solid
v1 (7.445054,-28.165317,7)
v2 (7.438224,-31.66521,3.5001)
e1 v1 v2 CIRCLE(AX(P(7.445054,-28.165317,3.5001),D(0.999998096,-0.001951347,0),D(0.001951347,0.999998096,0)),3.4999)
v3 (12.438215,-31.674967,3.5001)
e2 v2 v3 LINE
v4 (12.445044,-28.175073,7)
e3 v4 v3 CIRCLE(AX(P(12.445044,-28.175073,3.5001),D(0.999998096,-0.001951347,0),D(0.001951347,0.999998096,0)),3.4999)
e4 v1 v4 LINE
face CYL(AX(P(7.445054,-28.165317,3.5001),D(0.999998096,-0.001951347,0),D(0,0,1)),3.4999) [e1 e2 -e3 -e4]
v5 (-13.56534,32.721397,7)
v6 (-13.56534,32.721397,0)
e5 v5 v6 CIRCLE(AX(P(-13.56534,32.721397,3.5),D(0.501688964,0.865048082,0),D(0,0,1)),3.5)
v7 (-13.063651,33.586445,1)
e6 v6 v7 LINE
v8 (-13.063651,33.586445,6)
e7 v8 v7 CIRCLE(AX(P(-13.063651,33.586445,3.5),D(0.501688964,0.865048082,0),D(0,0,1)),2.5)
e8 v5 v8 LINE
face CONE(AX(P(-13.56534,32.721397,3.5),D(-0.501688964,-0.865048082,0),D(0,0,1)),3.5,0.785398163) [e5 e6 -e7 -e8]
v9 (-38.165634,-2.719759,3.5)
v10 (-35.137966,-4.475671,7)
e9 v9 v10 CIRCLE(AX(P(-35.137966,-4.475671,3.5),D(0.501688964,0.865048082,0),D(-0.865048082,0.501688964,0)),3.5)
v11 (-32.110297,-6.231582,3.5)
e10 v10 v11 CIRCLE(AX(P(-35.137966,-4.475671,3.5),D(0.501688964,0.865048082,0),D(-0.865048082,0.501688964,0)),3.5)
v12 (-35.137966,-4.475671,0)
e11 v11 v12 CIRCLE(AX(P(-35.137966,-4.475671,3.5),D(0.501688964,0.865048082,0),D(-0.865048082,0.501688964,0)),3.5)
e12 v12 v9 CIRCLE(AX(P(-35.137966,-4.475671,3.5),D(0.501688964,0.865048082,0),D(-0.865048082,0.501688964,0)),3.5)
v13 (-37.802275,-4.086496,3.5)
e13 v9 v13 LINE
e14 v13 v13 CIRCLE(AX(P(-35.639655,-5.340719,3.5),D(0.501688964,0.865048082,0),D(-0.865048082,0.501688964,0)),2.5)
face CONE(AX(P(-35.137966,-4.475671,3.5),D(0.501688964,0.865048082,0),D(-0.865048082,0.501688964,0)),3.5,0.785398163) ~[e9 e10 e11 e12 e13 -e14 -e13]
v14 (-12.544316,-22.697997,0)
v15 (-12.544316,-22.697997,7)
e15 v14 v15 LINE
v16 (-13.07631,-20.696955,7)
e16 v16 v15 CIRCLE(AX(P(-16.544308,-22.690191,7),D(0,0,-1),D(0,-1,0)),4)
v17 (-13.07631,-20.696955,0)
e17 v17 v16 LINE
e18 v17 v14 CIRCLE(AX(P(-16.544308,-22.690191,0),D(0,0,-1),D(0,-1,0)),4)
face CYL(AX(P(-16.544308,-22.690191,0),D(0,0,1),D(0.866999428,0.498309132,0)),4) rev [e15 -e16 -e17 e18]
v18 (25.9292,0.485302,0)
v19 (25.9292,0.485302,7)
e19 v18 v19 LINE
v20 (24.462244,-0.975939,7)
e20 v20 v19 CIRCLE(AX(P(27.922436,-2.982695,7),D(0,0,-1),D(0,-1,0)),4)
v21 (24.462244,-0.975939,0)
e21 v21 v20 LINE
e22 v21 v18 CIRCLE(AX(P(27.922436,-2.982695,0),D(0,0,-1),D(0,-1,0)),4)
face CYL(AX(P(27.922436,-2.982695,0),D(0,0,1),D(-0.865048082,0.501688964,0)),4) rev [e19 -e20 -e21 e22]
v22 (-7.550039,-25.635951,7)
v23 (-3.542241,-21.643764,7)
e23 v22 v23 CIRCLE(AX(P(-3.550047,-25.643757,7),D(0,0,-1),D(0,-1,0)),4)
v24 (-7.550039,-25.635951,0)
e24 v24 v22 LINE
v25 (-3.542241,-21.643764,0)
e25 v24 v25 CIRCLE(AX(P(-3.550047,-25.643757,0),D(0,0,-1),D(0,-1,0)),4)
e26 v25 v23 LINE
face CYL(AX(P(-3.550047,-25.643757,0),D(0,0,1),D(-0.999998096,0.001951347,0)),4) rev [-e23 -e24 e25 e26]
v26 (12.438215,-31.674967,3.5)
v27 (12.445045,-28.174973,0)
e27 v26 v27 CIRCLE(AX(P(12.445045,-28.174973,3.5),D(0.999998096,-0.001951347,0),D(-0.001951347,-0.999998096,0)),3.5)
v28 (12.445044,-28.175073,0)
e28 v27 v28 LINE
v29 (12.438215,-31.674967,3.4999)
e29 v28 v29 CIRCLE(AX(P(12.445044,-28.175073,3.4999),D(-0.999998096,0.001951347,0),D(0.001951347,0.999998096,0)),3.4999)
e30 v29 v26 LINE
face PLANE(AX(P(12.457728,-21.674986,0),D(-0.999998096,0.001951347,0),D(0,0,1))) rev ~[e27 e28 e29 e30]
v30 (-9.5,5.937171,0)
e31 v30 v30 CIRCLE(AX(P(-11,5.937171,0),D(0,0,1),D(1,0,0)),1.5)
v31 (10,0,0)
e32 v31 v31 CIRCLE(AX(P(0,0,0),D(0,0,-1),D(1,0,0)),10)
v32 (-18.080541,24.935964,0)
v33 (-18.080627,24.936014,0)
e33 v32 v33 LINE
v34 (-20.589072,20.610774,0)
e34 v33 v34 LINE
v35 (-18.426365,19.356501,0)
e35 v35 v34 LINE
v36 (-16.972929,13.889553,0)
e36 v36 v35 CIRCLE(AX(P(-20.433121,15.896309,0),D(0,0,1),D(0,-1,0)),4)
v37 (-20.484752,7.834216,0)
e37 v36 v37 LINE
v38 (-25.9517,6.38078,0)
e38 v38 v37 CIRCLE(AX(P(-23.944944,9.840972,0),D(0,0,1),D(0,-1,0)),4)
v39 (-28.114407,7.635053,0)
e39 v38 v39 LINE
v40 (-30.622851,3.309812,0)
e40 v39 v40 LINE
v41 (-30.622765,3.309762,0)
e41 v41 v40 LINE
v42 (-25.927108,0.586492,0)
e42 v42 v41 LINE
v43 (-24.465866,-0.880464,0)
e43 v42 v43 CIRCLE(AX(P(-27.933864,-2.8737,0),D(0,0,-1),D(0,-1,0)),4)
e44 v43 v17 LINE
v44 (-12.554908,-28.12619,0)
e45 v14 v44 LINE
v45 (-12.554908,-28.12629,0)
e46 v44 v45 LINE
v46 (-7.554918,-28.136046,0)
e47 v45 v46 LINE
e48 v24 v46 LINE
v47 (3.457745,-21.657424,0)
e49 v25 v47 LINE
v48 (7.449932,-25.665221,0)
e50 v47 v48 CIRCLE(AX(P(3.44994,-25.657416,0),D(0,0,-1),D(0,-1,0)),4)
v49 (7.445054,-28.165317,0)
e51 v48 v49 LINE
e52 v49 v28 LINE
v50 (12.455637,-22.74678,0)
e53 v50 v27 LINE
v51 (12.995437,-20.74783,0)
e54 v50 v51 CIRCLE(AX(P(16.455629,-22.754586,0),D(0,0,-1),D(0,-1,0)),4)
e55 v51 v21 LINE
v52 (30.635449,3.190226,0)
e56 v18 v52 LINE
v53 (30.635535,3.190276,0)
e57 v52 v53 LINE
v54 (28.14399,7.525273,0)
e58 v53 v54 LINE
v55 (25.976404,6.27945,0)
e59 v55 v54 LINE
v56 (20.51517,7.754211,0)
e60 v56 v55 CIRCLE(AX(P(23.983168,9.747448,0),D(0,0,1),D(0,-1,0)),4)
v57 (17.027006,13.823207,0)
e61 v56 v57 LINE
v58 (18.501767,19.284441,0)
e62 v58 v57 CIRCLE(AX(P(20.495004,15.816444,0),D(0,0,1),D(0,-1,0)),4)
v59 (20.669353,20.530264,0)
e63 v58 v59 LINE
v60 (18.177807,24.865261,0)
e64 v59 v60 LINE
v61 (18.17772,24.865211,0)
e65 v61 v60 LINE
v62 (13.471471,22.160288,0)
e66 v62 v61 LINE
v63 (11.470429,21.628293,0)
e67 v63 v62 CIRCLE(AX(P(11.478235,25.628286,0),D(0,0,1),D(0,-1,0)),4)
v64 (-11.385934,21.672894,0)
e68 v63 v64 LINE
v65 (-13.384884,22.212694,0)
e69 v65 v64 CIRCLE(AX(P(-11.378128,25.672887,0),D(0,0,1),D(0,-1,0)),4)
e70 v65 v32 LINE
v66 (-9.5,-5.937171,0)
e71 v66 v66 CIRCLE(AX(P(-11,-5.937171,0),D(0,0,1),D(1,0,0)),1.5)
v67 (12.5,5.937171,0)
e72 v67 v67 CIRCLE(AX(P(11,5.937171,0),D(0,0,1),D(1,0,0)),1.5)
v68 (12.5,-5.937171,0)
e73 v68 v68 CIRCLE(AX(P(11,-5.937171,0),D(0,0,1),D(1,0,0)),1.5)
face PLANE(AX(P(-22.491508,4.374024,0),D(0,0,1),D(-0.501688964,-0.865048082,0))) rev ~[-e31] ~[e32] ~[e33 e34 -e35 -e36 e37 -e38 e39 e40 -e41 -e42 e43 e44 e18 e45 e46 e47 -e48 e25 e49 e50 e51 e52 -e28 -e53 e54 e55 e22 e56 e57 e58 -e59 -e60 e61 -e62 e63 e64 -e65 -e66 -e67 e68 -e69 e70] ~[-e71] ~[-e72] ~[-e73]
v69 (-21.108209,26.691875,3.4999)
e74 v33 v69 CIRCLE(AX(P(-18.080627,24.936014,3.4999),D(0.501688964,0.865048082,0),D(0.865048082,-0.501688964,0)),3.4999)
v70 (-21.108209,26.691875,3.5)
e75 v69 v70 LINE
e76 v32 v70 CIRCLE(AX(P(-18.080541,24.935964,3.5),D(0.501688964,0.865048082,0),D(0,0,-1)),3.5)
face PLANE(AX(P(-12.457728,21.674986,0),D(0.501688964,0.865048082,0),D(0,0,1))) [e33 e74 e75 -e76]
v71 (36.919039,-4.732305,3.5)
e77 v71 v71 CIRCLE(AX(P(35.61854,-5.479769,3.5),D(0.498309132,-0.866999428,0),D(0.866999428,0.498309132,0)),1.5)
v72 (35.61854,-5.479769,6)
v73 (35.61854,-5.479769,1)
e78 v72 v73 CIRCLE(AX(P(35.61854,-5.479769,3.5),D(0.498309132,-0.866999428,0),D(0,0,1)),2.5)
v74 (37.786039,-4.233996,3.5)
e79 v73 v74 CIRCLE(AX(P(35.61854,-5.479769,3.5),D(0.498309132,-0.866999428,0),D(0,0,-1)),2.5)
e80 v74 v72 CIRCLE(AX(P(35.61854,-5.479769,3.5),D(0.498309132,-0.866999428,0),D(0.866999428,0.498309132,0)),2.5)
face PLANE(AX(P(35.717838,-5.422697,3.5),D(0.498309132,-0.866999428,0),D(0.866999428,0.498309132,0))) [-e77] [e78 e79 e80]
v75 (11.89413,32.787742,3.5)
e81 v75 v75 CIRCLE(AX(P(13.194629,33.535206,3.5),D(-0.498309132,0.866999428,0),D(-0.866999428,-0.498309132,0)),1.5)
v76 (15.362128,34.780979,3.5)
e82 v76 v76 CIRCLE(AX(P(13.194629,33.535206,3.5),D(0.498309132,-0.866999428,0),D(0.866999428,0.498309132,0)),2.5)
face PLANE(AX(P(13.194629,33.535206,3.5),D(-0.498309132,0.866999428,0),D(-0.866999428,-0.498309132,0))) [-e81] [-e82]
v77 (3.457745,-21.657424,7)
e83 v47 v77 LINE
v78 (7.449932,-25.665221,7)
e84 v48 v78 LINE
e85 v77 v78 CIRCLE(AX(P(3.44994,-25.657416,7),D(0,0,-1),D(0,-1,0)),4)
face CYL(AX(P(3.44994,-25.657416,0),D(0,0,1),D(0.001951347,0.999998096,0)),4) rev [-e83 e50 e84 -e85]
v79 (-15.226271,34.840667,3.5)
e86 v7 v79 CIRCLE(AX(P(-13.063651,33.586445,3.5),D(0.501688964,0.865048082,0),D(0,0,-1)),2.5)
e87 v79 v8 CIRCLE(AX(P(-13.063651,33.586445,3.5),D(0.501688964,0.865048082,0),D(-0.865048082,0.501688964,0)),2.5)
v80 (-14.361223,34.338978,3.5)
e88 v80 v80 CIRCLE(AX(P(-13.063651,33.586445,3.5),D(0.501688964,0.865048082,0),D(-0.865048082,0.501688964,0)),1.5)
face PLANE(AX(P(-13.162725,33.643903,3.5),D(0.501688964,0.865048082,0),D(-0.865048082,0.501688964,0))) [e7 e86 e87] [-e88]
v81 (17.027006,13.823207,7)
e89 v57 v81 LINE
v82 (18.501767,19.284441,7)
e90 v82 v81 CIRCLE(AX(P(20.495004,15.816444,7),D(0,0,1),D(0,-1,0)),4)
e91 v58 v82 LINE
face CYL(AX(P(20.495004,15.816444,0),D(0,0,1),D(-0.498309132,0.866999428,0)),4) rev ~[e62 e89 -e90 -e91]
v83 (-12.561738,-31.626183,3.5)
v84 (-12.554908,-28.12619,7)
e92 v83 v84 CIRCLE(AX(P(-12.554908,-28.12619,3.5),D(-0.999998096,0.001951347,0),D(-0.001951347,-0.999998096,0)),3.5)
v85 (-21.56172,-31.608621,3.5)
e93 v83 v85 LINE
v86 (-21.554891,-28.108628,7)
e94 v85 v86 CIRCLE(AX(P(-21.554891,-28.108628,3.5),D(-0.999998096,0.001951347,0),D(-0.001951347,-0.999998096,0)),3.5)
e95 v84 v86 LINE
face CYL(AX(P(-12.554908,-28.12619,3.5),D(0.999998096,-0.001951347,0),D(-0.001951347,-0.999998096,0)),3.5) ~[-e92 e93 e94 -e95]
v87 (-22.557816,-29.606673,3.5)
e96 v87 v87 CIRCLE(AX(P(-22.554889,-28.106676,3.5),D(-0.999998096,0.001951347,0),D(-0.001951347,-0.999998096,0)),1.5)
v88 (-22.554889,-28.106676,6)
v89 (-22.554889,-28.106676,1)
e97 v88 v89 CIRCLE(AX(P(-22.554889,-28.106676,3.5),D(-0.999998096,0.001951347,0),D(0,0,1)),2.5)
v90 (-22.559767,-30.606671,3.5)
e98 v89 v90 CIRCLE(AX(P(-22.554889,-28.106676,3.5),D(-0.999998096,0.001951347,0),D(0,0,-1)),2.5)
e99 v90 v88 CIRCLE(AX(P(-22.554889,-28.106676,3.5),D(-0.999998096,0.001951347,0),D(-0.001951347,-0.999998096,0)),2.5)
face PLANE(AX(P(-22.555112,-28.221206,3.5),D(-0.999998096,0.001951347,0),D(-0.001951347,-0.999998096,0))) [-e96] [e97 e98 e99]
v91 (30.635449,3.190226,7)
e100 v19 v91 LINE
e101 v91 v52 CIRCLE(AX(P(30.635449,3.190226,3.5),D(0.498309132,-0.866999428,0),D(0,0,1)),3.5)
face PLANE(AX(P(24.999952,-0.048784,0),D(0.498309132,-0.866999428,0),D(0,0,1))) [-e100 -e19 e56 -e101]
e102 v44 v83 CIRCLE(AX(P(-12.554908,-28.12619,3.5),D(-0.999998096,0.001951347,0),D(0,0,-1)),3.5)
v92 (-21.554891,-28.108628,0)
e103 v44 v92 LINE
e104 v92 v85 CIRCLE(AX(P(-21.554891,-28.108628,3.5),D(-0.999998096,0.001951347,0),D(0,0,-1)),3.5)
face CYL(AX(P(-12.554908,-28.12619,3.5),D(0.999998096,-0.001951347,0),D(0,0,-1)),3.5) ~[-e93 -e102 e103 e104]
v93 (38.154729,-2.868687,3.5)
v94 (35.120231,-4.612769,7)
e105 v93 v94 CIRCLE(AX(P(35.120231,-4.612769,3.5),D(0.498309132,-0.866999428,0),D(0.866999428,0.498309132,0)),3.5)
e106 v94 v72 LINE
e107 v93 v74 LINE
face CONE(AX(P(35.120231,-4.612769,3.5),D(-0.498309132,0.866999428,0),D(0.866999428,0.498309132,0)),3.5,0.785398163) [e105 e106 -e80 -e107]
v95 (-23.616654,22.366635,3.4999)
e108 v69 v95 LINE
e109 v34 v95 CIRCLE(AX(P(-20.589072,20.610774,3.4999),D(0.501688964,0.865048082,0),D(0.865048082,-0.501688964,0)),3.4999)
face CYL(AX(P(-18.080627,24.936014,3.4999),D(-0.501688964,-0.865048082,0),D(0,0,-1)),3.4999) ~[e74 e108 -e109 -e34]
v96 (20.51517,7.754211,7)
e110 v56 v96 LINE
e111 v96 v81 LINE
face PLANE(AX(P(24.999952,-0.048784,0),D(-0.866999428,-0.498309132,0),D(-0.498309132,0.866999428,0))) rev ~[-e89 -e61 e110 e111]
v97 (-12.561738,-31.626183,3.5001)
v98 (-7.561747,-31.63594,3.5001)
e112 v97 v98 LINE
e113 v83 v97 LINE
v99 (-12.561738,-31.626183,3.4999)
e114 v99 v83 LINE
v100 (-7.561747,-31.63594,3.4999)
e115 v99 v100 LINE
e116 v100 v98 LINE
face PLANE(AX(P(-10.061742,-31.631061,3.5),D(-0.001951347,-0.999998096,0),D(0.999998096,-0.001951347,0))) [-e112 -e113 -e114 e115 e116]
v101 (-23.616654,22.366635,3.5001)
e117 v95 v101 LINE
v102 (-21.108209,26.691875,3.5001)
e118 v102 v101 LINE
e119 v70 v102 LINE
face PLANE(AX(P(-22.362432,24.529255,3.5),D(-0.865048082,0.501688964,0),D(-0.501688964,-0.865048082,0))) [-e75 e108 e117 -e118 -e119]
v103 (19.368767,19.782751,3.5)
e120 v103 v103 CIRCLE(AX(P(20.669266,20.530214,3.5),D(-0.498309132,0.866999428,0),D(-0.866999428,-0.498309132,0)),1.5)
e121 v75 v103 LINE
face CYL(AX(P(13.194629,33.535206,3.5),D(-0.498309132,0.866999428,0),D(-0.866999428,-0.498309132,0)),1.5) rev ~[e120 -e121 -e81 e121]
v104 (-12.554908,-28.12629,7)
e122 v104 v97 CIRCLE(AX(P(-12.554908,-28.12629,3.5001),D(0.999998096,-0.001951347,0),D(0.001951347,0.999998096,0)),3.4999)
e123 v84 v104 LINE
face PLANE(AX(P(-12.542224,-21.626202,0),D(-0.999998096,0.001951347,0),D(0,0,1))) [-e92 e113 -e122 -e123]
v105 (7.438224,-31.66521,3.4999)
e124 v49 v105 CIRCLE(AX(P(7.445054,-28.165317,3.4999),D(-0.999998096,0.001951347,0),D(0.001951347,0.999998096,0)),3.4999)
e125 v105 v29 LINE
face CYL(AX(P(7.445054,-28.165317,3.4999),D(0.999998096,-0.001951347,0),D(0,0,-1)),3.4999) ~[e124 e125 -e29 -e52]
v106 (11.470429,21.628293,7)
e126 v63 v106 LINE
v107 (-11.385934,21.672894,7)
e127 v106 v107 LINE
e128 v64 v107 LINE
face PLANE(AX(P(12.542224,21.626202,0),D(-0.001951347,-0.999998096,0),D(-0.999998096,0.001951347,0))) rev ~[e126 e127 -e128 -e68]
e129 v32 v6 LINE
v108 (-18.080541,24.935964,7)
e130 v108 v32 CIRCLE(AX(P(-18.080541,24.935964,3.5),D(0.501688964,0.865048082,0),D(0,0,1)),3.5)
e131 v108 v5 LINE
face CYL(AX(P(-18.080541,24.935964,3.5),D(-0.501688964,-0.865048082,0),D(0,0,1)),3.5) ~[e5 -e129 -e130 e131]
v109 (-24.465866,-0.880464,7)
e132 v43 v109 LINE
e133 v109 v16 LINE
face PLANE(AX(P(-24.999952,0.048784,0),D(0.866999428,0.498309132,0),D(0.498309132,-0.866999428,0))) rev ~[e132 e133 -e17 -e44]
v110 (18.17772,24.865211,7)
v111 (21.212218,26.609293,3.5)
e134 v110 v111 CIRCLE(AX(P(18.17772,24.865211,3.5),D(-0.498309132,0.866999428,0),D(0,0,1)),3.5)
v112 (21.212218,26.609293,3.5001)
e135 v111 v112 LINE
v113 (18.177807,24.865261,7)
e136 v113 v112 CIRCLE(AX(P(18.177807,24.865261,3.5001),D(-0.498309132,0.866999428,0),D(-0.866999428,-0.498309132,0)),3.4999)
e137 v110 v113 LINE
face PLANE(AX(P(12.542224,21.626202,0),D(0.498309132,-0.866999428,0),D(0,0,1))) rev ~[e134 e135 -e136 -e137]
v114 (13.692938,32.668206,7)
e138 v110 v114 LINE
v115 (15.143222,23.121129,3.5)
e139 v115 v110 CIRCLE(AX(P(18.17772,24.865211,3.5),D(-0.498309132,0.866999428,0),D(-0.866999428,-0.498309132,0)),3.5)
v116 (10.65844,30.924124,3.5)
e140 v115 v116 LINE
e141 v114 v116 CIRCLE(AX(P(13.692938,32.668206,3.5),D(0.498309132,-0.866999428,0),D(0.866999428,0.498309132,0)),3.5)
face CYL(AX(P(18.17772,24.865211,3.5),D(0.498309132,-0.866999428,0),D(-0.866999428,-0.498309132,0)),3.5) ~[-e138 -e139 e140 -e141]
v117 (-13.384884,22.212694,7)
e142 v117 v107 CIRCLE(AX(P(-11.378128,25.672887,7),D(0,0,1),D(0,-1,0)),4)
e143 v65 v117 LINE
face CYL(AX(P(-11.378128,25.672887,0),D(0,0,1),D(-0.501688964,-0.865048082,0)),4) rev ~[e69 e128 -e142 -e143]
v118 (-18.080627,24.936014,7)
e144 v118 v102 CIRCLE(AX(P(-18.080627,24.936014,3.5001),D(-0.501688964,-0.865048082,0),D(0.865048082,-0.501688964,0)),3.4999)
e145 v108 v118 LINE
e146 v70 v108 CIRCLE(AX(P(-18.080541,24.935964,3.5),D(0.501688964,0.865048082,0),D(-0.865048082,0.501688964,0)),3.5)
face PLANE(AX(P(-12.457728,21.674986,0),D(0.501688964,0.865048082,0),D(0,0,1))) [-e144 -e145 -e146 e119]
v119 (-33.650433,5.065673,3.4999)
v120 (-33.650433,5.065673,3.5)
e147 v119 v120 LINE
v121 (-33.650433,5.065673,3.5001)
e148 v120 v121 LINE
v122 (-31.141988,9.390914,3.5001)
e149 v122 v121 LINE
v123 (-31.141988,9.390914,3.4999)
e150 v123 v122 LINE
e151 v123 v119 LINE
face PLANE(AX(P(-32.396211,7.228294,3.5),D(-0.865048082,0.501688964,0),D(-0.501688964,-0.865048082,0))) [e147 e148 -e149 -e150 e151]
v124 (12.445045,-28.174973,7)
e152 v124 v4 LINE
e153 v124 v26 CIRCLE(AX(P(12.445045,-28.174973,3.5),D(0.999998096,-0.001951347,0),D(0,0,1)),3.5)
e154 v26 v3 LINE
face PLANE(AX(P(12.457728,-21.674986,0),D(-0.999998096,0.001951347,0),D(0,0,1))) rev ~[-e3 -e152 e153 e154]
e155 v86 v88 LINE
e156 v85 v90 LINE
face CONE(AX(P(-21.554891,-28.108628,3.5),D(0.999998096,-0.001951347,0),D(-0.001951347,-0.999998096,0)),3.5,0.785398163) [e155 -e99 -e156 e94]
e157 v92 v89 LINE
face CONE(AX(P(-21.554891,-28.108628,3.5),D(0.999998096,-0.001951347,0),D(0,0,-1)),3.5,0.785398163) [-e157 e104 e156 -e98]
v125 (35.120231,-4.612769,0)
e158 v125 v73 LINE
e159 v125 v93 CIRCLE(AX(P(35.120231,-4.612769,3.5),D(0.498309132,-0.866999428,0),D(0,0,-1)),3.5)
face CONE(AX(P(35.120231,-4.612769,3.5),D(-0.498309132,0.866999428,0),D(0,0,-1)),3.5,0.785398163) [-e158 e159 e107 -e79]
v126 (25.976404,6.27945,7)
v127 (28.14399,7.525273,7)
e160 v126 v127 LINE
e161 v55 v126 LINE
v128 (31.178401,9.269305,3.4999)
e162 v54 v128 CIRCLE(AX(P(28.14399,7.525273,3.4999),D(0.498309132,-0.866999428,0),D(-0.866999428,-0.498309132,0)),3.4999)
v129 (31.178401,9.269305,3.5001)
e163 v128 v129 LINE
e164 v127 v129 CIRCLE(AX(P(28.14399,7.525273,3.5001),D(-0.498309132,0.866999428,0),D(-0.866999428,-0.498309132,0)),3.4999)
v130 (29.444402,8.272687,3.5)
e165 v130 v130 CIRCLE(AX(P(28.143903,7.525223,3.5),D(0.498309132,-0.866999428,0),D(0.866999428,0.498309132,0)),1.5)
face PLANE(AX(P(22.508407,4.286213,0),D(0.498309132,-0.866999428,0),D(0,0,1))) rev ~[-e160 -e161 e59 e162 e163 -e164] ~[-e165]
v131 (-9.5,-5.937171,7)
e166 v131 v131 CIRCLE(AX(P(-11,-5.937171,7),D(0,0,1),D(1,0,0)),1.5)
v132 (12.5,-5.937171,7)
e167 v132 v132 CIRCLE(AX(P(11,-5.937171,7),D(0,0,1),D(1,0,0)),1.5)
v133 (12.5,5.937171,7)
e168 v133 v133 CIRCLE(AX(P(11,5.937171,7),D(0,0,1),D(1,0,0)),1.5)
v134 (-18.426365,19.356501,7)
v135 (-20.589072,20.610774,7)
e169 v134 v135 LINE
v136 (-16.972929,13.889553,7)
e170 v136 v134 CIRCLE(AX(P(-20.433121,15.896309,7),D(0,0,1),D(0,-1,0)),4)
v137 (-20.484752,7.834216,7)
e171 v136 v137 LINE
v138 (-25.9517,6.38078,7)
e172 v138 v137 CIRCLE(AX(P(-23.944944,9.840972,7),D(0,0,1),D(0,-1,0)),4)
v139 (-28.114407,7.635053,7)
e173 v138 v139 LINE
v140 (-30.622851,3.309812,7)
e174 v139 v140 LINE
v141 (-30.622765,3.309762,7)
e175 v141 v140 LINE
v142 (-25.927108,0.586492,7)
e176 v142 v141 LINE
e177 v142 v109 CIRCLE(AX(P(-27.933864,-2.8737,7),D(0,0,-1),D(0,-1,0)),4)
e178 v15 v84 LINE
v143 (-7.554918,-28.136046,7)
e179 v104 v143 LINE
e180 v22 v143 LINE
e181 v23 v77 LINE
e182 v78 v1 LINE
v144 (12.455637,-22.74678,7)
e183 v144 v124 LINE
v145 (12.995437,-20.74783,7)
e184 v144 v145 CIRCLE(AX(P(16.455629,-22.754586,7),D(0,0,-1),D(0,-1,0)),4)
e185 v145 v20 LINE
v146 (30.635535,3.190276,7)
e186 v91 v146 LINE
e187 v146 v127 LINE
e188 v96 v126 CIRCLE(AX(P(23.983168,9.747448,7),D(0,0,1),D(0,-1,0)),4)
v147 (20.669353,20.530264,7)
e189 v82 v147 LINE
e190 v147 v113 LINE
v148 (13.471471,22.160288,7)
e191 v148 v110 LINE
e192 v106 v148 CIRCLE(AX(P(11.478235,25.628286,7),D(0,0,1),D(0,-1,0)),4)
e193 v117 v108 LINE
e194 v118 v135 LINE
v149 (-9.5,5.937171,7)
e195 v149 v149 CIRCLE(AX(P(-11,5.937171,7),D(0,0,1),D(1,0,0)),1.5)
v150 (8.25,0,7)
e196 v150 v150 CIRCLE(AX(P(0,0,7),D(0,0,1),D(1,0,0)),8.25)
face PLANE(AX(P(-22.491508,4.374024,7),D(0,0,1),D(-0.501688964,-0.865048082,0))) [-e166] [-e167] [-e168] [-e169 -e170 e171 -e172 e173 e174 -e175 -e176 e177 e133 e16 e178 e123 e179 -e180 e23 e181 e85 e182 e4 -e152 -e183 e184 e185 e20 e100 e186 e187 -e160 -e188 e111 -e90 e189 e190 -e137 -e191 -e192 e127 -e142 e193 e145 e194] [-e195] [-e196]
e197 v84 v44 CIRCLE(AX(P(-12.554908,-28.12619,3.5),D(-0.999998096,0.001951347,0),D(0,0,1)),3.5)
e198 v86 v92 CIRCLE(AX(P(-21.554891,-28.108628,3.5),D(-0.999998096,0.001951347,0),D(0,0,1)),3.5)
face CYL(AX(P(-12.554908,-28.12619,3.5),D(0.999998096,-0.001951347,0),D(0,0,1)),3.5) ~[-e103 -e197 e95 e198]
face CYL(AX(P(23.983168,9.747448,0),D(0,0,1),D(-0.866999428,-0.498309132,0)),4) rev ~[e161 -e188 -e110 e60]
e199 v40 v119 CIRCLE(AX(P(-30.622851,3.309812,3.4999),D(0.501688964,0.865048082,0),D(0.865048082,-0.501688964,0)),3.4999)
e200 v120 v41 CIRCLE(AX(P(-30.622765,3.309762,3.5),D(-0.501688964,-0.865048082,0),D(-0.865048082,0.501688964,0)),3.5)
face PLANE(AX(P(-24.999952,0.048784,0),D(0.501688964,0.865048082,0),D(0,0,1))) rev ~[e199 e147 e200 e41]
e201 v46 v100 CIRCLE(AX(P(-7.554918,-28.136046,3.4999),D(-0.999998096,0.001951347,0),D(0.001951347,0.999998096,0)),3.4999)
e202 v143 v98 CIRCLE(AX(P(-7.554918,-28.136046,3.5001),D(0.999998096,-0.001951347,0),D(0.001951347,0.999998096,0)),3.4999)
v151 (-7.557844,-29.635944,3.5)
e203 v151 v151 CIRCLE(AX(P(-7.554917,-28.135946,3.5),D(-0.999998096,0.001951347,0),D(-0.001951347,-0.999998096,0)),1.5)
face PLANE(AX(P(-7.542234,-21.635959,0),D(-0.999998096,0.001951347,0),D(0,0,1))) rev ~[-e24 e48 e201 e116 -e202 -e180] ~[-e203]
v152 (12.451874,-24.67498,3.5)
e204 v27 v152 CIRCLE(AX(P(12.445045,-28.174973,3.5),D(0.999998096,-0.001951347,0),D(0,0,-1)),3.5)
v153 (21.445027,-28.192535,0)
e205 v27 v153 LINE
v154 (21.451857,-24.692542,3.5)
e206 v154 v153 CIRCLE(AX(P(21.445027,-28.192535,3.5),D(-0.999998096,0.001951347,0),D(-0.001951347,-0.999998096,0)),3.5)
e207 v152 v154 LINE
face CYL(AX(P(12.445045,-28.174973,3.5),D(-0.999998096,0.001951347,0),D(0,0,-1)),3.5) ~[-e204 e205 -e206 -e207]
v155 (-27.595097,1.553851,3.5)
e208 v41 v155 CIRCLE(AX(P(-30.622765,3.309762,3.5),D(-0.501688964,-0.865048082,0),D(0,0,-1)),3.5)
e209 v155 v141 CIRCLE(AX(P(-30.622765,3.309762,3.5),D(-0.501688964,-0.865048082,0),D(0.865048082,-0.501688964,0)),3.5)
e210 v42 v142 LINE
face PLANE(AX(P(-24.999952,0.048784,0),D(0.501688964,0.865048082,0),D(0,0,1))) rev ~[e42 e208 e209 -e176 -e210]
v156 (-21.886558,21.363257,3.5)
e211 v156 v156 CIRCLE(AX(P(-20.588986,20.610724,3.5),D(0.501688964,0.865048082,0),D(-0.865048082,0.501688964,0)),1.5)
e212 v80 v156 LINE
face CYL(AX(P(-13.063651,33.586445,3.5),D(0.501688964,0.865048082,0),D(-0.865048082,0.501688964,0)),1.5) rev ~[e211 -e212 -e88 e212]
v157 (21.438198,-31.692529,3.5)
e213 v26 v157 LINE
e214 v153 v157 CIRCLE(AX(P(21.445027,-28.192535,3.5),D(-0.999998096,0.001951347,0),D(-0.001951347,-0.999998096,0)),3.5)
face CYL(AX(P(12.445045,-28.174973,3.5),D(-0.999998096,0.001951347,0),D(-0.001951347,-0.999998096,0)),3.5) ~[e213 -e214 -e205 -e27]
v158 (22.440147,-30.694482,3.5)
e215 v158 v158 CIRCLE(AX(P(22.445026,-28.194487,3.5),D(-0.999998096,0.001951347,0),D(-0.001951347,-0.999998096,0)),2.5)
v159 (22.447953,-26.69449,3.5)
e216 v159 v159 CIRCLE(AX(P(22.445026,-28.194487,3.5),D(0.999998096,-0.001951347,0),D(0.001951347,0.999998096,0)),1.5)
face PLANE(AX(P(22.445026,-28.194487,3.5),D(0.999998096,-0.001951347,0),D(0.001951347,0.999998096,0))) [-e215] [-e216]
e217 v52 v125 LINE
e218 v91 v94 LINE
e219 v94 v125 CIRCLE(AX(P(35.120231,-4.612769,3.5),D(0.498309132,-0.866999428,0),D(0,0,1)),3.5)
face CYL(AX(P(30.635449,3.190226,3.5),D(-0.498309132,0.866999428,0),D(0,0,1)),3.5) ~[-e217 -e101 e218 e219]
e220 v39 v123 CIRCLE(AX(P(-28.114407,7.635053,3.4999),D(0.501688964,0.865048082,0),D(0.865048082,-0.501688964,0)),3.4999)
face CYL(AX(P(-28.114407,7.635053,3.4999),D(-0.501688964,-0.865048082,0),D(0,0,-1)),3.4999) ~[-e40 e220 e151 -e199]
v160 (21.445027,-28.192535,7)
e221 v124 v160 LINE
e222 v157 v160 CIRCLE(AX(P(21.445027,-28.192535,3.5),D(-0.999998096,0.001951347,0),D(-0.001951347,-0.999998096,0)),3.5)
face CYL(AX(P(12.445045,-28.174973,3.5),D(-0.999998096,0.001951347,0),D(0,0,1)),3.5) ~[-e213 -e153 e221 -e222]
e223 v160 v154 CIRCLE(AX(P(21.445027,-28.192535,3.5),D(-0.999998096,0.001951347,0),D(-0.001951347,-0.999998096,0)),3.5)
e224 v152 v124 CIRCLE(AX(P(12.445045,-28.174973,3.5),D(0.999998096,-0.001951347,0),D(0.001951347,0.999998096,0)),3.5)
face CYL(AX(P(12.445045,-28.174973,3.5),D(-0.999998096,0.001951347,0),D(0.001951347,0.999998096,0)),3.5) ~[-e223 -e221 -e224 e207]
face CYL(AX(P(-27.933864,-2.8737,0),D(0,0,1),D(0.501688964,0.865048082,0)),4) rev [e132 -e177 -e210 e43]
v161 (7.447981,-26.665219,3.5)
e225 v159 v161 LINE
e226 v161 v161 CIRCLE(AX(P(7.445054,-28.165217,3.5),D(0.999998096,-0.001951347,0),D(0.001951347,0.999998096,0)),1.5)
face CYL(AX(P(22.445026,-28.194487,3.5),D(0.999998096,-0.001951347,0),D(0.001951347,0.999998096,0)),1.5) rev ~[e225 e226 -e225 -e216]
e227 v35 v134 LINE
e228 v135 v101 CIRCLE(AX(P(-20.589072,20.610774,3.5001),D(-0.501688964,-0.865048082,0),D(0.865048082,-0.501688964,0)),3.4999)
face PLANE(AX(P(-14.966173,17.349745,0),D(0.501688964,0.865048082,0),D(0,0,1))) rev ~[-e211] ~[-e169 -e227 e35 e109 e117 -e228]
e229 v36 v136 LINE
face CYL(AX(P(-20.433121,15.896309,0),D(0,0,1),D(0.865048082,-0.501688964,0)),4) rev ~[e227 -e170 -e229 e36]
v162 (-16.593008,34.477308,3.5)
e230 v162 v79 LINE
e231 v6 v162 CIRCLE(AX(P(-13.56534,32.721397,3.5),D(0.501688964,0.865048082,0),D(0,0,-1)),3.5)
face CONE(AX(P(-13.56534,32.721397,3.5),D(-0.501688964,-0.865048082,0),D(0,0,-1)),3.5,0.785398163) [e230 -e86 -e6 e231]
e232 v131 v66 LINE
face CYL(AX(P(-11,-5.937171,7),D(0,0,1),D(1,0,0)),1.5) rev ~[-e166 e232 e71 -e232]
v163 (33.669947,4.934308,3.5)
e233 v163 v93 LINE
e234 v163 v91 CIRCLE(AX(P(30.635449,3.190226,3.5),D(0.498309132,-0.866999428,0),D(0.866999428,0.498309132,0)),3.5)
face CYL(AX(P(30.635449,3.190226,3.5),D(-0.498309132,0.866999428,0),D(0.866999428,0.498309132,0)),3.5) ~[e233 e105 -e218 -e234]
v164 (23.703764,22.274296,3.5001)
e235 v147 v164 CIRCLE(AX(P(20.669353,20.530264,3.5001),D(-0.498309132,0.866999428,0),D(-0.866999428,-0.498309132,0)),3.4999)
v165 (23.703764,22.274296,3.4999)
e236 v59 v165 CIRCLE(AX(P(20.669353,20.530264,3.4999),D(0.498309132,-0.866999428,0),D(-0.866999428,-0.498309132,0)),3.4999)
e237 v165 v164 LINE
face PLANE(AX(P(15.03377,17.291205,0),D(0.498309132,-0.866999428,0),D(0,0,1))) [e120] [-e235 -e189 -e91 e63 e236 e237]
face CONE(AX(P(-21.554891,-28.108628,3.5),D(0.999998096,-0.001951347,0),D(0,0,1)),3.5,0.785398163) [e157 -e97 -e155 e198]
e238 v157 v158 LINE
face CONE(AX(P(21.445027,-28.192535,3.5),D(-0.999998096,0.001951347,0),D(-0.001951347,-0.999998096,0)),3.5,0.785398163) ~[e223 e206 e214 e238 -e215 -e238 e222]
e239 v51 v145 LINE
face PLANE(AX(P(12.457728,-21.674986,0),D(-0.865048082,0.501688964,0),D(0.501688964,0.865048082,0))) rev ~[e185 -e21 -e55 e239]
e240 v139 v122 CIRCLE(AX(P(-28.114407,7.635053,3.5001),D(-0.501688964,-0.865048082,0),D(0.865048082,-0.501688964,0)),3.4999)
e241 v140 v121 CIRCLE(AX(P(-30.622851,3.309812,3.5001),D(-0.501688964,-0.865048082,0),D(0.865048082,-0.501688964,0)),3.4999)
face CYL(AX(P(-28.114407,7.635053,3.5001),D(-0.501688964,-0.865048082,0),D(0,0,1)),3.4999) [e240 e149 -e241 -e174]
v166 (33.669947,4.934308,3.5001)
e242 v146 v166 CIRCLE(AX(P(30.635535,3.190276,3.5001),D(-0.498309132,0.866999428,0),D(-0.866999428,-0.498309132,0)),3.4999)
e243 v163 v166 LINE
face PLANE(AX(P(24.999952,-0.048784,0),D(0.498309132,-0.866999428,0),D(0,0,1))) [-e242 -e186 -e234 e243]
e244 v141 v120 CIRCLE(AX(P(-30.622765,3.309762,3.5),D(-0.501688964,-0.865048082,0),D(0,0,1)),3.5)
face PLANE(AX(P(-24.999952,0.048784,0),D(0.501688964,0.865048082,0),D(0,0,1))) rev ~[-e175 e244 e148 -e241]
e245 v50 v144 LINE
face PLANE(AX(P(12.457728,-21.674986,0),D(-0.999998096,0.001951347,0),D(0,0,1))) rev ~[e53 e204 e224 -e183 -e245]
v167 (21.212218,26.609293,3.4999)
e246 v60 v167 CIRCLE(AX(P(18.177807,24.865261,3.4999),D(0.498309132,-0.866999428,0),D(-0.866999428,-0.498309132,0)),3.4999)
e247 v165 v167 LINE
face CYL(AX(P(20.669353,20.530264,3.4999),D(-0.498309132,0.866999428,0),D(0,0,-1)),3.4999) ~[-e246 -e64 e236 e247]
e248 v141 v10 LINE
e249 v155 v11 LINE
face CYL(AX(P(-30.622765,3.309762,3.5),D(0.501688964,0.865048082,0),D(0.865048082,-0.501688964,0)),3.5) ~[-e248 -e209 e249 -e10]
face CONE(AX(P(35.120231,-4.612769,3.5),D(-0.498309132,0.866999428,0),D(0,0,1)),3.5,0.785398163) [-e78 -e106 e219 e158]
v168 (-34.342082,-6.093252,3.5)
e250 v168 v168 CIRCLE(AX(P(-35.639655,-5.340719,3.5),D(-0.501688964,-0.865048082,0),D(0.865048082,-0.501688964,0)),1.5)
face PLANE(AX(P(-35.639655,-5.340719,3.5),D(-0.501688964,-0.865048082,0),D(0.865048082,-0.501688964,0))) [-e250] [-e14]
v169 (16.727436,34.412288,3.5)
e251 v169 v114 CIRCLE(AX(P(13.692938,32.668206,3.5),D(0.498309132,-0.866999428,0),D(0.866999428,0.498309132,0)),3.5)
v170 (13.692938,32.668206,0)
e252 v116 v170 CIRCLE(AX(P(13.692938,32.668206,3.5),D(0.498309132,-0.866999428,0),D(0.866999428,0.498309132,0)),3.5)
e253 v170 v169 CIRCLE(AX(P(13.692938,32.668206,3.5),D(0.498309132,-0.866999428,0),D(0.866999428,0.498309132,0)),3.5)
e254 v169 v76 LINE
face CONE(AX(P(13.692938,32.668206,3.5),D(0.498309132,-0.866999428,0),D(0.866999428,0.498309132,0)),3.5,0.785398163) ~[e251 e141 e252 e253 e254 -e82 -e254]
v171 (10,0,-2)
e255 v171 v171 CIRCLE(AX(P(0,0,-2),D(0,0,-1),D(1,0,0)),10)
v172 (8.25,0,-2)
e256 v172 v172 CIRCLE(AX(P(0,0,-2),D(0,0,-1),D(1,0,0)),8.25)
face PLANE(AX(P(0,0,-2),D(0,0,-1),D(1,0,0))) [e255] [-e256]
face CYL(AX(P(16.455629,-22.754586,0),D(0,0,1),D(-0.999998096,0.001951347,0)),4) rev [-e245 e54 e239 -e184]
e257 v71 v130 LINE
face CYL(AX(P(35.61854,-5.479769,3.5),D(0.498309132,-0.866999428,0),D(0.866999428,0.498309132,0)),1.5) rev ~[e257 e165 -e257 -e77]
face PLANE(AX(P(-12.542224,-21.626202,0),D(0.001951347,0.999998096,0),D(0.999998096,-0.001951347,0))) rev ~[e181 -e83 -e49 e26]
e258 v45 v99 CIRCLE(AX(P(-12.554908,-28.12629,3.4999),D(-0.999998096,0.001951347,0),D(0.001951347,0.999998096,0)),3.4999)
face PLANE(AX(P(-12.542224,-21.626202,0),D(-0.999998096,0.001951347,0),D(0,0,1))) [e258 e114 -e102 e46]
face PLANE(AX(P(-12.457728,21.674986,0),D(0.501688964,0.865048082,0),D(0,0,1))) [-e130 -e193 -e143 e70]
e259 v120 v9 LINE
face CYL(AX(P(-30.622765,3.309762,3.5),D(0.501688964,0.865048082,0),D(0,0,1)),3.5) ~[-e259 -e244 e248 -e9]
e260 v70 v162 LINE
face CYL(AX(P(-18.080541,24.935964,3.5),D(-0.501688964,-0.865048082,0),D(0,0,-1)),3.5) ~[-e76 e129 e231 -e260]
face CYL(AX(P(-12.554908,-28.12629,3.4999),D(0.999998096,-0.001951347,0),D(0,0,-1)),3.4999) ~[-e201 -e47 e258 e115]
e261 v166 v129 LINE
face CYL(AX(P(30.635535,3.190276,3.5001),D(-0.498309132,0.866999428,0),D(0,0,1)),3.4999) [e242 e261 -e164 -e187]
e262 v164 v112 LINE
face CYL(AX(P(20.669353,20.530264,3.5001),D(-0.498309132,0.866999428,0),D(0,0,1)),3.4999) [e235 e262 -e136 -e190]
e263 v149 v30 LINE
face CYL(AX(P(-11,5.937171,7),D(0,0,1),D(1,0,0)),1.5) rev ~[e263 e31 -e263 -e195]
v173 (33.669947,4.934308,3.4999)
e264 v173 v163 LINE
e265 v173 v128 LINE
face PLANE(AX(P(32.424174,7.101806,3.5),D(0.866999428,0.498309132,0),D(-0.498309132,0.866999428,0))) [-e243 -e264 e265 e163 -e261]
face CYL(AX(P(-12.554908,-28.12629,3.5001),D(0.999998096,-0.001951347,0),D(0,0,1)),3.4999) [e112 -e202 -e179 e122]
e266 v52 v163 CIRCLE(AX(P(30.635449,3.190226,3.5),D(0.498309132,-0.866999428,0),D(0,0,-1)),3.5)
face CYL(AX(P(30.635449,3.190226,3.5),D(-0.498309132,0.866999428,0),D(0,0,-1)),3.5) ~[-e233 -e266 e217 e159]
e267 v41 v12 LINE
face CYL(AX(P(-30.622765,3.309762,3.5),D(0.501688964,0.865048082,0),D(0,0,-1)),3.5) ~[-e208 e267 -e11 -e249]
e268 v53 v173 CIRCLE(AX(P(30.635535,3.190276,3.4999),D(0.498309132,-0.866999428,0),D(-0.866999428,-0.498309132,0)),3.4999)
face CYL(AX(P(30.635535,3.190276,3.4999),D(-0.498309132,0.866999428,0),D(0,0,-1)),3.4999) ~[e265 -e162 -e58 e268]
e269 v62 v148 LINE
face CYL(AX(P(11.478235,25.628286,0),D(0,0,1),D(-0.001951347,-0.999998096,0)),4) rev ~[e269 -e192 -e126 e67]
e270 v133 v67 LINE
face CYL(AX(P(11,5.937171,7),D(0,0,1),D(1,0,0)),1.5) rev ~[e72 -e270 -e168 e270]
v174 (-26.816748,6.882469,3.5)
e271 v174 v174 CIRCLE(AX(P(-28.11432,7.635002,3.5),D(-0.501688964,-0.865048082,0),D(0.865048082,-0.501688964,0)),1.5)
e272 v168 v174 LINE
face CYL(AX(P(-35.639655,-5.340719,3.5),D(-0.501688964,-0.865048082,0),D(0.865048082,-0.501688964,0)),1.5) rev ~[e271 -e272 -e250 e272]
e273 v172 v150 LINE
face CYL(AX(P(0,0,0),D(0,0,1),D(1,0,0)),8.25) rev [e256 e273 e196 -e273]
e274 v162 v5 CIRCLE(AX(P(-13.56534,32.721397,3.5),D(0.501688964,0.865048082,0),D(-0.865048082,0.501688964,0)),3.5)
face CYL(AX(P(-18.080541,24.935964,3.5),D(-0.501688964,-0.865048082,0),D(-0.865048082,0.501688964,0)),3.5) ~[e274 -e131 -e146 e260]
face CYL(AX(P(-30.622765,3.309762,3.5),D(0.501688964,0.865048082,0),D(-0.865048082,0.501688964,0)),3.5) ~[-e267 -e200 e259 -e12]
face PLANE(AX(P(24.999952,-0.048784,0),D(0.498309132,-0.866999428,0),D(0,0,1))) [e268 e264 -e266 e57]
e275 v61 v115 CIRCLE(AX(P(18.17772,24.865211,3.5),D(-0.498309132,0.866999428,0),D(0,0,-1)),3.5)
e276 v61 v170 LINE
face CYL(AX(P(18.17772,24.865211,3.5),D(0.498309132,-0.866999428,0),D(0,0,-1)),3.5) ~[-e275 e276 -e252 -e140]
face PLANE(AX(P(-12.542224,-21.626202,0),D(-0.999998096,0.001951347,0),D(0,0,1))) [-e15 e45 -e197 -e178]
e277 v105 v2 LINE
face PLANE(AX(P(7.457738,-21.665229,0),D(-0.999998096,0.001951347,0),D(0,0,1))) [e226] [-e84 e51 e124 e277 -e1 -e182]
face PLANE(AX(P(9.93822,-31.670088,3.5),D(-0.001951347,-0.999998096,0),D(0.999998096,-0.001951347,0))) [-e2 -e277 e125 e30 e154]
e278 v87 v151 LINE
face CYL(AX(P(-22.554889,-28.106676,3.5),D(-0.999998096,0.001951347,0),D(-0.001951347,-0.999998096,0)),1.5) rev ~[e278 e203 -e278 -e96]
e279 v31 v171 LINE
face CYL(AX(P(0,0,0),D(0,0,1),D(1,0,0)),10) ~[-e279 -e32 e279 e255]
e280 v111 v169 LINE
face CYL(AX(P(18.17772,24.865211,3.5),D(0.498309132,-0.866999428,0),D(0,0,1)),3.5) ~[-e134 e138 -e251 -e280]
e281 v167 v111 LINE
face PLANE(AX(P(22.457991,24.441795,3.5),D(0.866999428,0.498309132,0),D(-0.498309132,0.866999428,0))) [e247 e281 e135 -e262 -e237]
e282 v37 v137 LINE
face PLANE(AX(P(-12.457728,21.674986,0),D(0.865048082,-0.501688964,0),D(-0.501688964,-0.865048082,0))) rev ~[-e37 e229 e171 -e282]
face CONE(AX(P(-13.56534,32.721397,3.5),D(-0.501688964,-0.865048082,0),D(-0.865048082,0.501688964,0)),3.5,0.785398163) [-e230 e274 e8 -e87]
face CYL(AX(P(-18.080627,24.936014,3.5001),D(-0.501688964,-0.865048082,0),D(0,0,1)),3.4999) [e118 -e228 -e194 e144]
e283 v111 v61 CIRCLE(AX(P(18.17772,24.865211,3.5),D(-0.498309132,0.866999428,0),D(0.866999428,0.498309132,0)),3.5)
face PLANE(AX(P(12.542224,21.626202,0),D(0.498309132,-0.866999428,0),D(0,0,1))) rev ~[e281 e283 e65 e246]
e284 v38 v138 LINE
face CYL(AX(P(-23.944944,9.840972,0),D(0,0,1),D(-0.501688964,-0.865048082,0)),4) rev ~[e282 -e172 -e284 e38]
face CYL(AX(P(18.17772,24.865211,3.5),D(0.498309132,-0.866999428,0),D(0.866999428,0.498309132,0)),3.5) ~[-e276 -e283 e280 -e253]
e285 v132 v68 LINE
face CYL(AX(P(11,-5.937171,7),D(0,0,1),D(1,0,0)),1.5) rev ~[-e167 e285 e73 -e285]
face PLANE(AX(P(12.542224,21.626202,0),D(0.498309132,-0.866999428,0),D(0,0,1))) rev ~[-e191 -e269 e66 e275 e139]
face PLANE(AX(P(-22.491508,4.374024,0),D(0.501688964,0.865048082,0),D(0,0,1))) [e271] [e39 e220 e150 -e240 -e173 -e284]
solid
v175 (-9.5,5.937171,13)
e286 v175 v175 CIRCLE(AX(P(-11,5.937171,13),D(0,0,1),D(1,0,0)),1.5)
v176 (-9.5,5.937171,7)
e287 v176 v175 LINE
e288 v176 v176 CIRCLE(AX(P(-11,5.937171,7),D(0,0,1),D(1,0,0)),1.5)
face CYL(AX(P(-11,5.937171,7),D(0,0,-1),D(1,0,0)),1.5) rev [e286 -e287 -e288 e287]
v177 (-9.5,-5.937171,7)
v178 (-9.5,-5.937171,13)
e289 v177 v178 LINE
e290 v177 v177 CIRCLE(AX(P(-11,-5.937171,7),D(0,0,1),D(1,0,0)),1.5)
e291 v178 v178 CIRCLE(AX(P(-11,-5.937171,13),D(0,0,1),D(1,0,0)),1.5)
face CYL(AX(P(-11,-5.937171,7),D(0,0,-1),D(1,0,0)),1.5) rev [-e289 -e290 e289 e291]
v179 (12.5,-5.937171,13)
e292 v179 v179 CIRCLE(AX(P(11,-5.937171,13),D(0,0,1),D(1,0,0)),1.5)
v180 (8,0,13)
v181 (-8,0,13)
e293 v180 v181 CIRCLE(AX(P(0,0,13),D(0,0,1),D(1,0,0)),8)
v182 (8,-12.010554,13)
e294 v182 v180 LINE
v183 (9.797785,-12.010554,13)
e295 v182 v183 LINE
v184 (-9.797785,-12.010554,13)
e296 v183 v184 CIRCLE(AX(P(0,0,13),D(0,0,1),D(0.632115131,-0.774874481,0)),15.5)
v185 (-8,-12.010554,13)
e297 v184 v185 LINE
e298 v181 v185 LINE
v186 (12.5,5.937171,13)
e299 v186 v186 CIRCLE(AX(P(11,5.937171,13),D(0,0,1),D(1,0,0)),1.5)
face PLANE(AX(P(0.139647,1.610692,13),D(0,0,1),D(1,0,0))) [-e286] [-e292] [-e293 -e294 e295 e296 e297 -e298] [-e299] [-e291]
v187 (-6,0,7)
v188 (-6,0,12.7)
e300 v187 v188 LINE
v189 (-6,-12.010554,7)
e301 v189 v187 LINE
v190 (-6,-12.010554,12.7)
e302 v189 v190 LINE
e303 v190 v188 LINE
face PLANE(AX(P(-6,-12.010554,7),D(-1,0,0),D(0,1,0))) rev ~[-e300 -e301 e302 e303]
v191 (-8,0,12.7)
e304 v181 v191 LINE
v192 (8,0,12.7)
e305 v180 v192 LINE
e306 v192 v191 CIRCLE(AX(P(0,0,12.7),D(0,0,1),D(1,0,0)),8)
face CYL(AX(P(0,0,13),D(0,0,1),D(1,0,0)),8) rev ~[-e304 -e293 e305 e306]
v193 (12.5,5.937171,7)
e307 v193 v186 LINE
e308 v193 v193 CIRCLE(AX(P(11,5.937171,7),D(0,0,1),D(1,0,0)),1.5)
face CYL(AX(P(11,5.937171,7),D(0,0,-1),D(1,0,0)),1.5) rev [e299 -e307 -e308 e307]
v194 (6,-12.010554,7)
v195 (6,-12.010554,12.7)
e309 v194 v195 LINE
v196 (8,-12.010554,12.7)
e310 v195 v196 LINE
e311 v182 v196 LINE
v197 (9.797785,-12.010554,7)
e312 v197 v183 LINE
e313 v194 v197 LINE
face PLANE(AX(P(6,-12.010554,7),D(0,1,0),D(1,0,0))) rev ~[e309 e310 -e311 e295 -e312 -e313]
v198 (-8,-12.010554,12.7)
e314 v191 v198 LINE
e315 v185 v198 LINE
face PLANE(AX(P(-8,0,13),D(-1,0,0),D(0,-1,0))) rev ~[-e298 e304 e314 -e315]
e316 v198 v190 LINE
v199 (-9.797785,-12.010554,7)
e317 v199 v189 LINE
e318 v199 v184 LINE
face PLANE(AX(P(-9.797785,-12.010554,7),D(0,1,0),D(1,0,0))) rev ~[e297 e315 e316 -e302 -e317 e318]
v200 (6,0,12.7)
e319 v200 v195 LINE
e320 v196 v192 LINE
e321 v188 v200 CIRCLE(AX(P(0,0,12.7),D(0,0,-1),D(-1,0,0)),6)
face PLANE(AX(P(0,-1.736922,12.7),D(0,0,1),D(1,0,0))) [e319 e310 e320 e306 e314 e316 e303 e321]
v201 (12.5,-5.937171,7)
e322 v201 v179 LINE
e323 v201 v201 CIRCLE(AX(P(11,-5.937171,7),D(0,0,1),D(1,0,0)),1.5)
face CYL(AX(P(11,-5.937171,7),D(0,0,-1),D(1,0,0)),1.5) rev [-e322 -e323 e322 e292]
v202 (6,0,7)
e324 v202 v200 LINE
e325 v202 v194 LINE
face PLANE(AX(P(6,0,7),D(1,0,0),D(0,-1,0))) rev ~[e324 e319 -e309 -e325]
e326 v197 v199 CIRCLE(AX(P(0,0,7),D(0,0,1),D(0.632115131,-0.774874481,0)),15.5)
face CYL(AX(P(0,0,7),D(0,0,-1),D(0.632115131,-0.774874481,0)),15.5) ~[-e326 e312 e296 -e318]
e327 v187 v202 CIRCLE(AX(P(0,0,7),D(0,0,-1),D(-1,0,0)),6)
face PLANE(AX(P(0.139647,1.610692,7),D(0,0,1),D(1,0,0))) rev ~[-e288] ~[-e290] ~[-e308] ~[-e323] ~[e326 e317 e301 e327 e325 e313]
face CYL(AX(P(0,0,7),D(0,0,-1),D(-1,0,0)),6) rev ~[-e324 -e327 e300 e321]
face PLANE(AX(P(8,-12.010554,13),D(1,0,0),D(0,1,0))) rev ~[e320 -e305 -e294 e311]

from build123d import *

# Parameters (mm, degrees)
F0_R      = 11
F0_R_2    = 8.25
F1_DEPTH  = 7
F2_W      = 5
F2_H      = 7
F3_DEPTH  = 10
F5_DEPTH  = 10
F6_R      = 1.5
F7_DEPTH  = 25
F8_SIZE   = 1
F10_DEPTH = 10
F11_R     = 1.5
F12_DEPTH = 25
F14_W     = 5
F14_H     = 7
F15_DEPTH = 10
F17_DEPTH = 10
F18_R     = 1.5
F19_DEPTH = 25
F20_SIZE  = 1
F22_DEPTH = 10
F23_R     = 1.5
F24_DEPTH = 25
F26_W     = 5
F26_H     = 7
F27_DEPTH = 10
F29_DEPTH = 10
F30_R     = 1.5
F31_DEPTH = 25
F32_SIZE  = 1
F34_DEPTH = 10
F35_R     = 1.5
F36_DEPTH = 25
F38_R     = 1.5
F39_DEPTH = 25
F40_R     = 3.4999
F41_R     = 4
F42_R     = 1.5
F43_DEPTH = 6
F45_DEPTH = 0.3
F46_R     = 10
F46_R_2   = 8.25
F47_DEPTH = 2


# Not quite as in the source:
# - a fillet or chamfer that OpenCascade refuses, or shapes differently, is made with other operations: its cross-section is extruded or revolved along the edge and cut away or added
# - a fillet or chamfer is up to 0.001 mm smaller than in the source, because OpenCascade refuses the exact size


with BuildPart() as f1:
    # F0 (on Top) → F1 (new body)
    with BuildSketch(Plane.XY):
        Polygon((24.999952403, -0.0487836684), (12.5422240976, 21.6262020402), (-12.4577283054, 21.6749857086), (-24.999952403, 0.0487836684), (-12.5422240976, -21.6262020402), (12.4577283054, -21.6749857086), align=None)
        Circle(F0_R, mode=Mode.SUBTRACT)
        Circle(F0_R)
        Circle(F0_R_2, mode=Mode.SUBTRACT)
    extrude(amount=F1_DEPTH)

    # F2 (on face) → F3 (join)
    with BuildSketch(Plane(origin=(-0.0422478961, -21.6505938744, 0), x_dir=(0.9999980961, -0.0019513467, 0), z_dir=(-0.0019513467, -0.9999980961, 0))):
        with Locations((-10, 3.5)):
            Rectangle(F2_W, F2_H)
        with Locations((10, 3.5)):
            Rectangle(F2_W, F2_H)
    extrude(amount=F3_DEPTH)

    # F4 (on face) → F5 (join)
    with BuildSketch(Plane(origin=(-12.4999762015, 0.0243918342, 0), x_dir=(-0.0019513467, -0.9999980961, 0), z_dir=(-0.9999980961, 0.0019513467, 0))):
        with BuildLine():
            ThreePointArc((28.1506350946, 0), (30.6255088288, 1.0251262658), (31.6506350946, 3.5))
            ThreePointArc((31.6506350946, 3.5), (30.6255088288, 5.9748737342), (28.1506350946, 7))
            ThreePointArc((28.1506350946, 7), (24.6506350946, 3.5), (28.1506350946, 0))
        make_face()
    extrude(amount=F5_DEPTH)

    # F6 (on face) → F7 (cut)
    with BuildSketch(Plane(origin=(-22.4999571627, 0.0439053016, 0), x_dir=(-0.0019513467, -0.9999980961, 0), z_dir=(-0.9999980961, 0.0019513467, 0))):
        with Locations((28.1506350946, 3.5)):
            Circle(F6_R)
    extrude(amount=-F7_DEPTH, mode=Mode.SUBTRACT)

    # F8
    f8_edges = [f1.edges().sort_by_distance(p)[0] for p in [
        (-22.554889, -28.106676, 7),
    ]]
    chamfer(f8_edges, length=F8_SIZE)

    # F9 (on face) → F10 (join)
    with BuildSketch(Plane(origin=(12.4999762015, -0.0243918342, 0), x_dir=(0.0019513467, 0.9999980961, 0), z_dir=(0.9999980961, -0.0019513467, 0))):
        with BuildLine():
            ThreePointArc((-28.1506350946, 0), (-25.6757613605, 1.0251262658), (-24.6506350946, 3.5))
            ThreePointArc((-24.6506350946, 3.5), (-25.6757613605, 5.9748737342), (-28.1506350946, 7))
            ThreePointArc((-28.1506350946, 7), (-30.6255088288, 5.9748737342), (-31.6506350946, 3.5))
            ThreePointArc((-31.6506350946, 3.5), (-30.6255088288, 1.0251262658), (-28.1506350946, 0))
        make_face()
    extrude(amount=F10_DEPTH)

    # F11 (on face) → F12 (cut)
    with BuildSketch(Plane(origin=(22.4999571627, -0.0439053016, 0), x_dir=(0.0019513467, 0.9999980961, 0), z_dir=(0.9999980961, -0.0019513467, 0))):
        with Locations((-28.1506350946, 3.5)):
            Circle(F11_R)
    extrude(amount=-F12_DEPTH, mode=Mode.SUBTRACT)

    # F13: chamfer of 1 on 1 edges, made by hand

    # F13_s1 → F13_t2 (revolve, cut)
    with BuildSketch(Plane.XY.offset(3.5)):
        Polygon((21.4381977031, -31.6925287905), (22.440147146, -30.6944820411), (22.4381957992, -31.6944801372), align=None)
    revolve(axis=Axis((22.4450255128, -28.1944868008, 3.5), (-0.9999980961, 0.0019513467, 0)), mode=Mode.SUBTRACT)

    # F14 (on face) → F15 (join)
    with BuildSketch(Plane(origin=(18.7710882503, 10.7887091859, 0), x_dir=(-0.4983091322, 0.8669994283, 0), z_dir=(0.8669994283, 0.4983091322, 0))):
        with Locations((-10, 3.5)):
            Rectangle(F14_W, F14_H)
        with Locations((10, 3.5)):
            Rectangle(F14_W, F14_H)
    extrude(amount=F15_DEPTH)

    # F16 (on face) → F17 (join)
    with BuildSketch(Plane(origin=(6.2288641527, -10.8374928543, 0), x_dir=(0.8669994283, 0.4983091322, 0), z_dir=(0.4983091322, -0.8669994283, 0))):
        with BuildLine():
            ThreePointArc((28.1506350946, 0), (30.6255088288, 1.0251262658), (31.6506350946, 3.5))
            ThreePointArc((31.6506350946, 3.5), (30.6255088288, 5.9748737342), (28.1506350946, 7))
            ThreePointArc((28.1506350946, 7), (24.6506350946, 3.5), (28.1506350946, 0))
        make_face()
    extrude(amount=F17_DEPTH)

    # F18 (on face) → F19 (cut)
    with BuildSketch(Plane(origin=(11.2119554749, -19.5074871378, 0), x_dir=(0.8669994283, 0.4983091322, 0), z_dir=(0.4983091322, -0.8669994283, 0))):
        with Locations((28.1506350946, 3.5)):
            Circle(F18_R)
    extrude(amount=-F19_DEPTH, mode=Mode.SUBTRACT)

    # F20
    f20_edges = [f1.edges().sort_by_distance(p)[0] for p in [
        (35.61854, -5.479769, 7),
    ]]
    chamfer(f20_edges, length=F20_SIZE)

    # F21 (on face) → F22 (join)
    with BuildSketch(Plane(origin=(-6.2288641527, 10.8374928543, 0), x_dir=(-0.8669994283, -0.4983091322, 0), z_dir=(-0.4983091322, 0.8669994283, 0))):
        with BuildLine():
            ThreePointArc((-28.1506350946, 0), (-25.6757613605, 1.0251262658), (-24.6506350946, 3.5))
            ThreePointArc((-24.6506350946, 3.5), (-25.6757613605, 5.9748737342), (-28.1506350946, 7))
            ThreePointArc((-28.1506350946, 7), (-30.6255088288, 5.9748737342), (-31.6506350946, 3.5))
            ThreePointArc((-31.6506350946, 3.5), (-30.6255088288, 1.0251262658), (-28.1506350946, 0))
        make_face()
    extrude(amount=F22_DEPTH)

    # F23 (on face) → F24 (cut)
    with BuildSketch(Plane(origin=(-11.2119554749, 19.5074871378, 0), x_dir=(-0.8669994283, -0.4983091322, 0), z_dir=(-0.4983091322, 0.8669994283, 0))):
        with Locations((-28.1506350946, 3.5)):
            Circle(F23_R)
    extrude(amount=-F24_DEPTH, mode=Mode.SUBTRACT)

    # F25: chamfer of 1 on 1 edges, made by hand

    # F25_s1 → F25_t2 (revolve, cut)
    with BuildSketch(Plane.XY.offset(3.5)):
        Polygon((16.7274361911, 34.4122882175), (15.3621276306, 34.7809785136), (16.2291270589, 35.2792876458), align=None)
    revolve(axis=Axis((13.1946290597, 33.5352056831, 3.5), (0.4983091322, -0.8669994283, 0)), mode=Mode.SUBTRACT)

    # F26 (on face) → F27 (join)
    with BuildSketch(Plane(origin=(-18.7288403542, 10.8618846885, 0), x_dir=(-0.5016889639, -0.8650480816, 0), z_dir=(-0.8650480816, 0.5016889639, 0))):
        with Locations((10, 3.5)):
            Rectangle(F26_W, F26_H)
        with Locations((-10, 3.5)):
            Rectangle(F26_W, F26_H)
    extrude(amount=F27_DEPTH)

    # F28 (on face) → F29 (join)
    with BuildSketch(Plane(origin=(6.2711120488, 10.8131010201, 0), x_dir=(-0.8650480816, 0.5016889639, 0), z_dir=(0.5016889639, 0.8650480816, 0))):
        with BuildLine():
            ThreePointArc((28.1506350946, 0), (30.6255088288, 1.0251262658), (31.6506350946, 3.5))
            ThreePointArc((31.6506350946, 3.5), (30.6255088288, 5.9748737342), (28.1506350946, 7))
            ThreePointArc((28.1506350946, 7), (24.6506350946, 3.5), (28.1506350946, 0))
        make_face()
    extrude(amount=F29_DEPTH)

    # F30 (on face) → F31 (cut)
    with BuildSketch(Plane(origin=(11.2880016879, 19.4635818362, 0), x_dir=(-0.8650480816, 0.5016889639, 0), z_dir=(0.5016889639, 0.8650480816, 0))):
        with Locations((28.1506350946, 3.5)):
            Circle(F30_R)
    extrude(amount=-F31_DEPTH, mode=Mode.SUBTRACT)

    # F32
    f32_edges = [f1.edges().sort_by_distance(p)[0] for p in [
        (-13.063651, 33.586445, 7),
    ]]
    chamfer(f32_edges, length=F32_SIZE)

    # F33 (on face) → F34 (join)
    with BuildSketch(Plane(origin=(-6.2711120488, -10.8131010201, 0), x_dir=(0.8650480816, -0.5016889639, 0), z_dir=(-0.5016889639, -0.8650480816, 0))):
        with BuildLine():
            ThreePointArc((-28.1506350946, 0), (-25.6757613605, 1.0251262658), (-24.6506350946, 3.5))
            ThreePointArc((-24.6506350946, 3.5), (-25.6757613605, 5.9748737342), (-28.1506350946, 7))
            ThreePointArc((-28.1506350946, 7), (-30.6255088288, 5.9748737342), (-31.6506350946, 3.5))
            ThreePointArc((-31.6506350946, 3.5), (-30.6255088288, 1.0251262658), (-28.1506350946, 0))
        make_face()
    extrude(amount=F34_DEPTH)

    # F35 (on face) → F36 (cut)
    with BuildSketch(Plane(origin=(-11.2880016879, -19.4635818362, 0), x_dir=(0.8650480816, -0.5016889639, 0), z_dir=(-0.5016889639, -0.8650480816, 0))):
        with Locations((-28.1506350946, 3.5)):
            Circle(F35_R)
    extrude(amount=-F36_DEPTH, mode=Mode.SUBTRACT)

    # F37: chamfer of 1 on 1 edges, made by hand

    # F37_s1 → F37_t2 (revolve, cut)
    with BuildSketch(Plane.XY.offset(3.5)):
        Polygon((-38.1656338943, -2.719759427), (-37.8022747766, -4.0864964725), (-38.6673228582, -3.5848075086), align=None)
    revolve(axis=Axis((-35.6396545725, -5.3407188823, 3.5), (0.5016889639, 0.8650480816, 0)), mode=Mode.SUBTRACT)

    # F38 (on face) → F39 (cut)
    with BuildSketch(Plane.XY.offset(7)):
        with Locations((-11, 5.9371710435)):
            Circle(F38_R)
        with Locations((11, 5.9371710435)):
            Circle(F38_R)
        with Locations((11, -5.9371710435)):
            Circle(F38_R)
        with Locations((-11, -5.9371710435)):
            Circle(F38_R)
    extrude(amount=-F39_DEPTH, mode=Mode.SUBTRACT)

    # F40 (radius 3.5 in the source; OpenCascade refuses exactly that, so slightly less here)
    f40_edges = [f1.edges().sort_by_distance(p)[0] for p in [
        (-10.061742, -31.631061, 7),
        (-10.061742, -31.631061, 0),
        (9.93822, -31.670088, 0),
        (9.93822, -31.670088, 7),
        (32.424174, 7.101806, 0),
        (32.424174, 7.101806, 7),
        (22.457991, 24.441795, 0),
        (22.457991, 24.441795, 7),
        (-22.362432, 24.529255, 0),
        (-22.362432, 24.529255, 7),
        (-32.396211, 7.228294, 0),
        (-32.396211, 7.228294, 7),
    ]]
    fillet(f40_edges, radius=F40_R)

    # F41
    f41_edges = [f1.edges().sort_by_distance(p)[0] for p in [
        (-24.999952, 0.048784, 3.5),
        (-12.542224, -21.626202, 3.5),
        (7.457738, -21.665229, 3.5),
        (-7.542234, -21.635959, 3.5),
        (12.457728, -21.674986, 3.5),
        (24.999952, -0.048784, 3.5),
        (22.508407, 4.286213, 3.5),
        (15.03377, 17.291205, 3.5),
        (12.542224, 21.626202, 3.5),
        (-12.457728, 21.674986, 3.5),
        (-14.966173, 17.349745, 3.5),
        (-22.491508, 4.374024, 3.5),
    ]]
    fillet(f41_edges, radius=F41_R)

    # F46 (on face) → F47 (join)
    with BuildSketch(Plane(origin=(0, 0, 0), x_dir=(1, 0, 0), z_dir=(0, 0, -1))):
        Circle(F46_R)
        Circle(F46_R_2, mode=Mode.SUBTRACT)
    extrude(amount=F47_DEPTH)


with BuildPart() as f43:
    # F42 (on face) → F43 (new body)
    with BuildSketch(Plane.XY.offset(7)):
        with BuildLine():
            ThreePointArc((-6, 0), (0, 6), (6, 0))
            Line((6, 0), (6, -5.6623758265))
            ThreePointArc((6, -5.6623758265), (7.6668931126, -3.0465144017), (8.25, 0))
            ThreePointArc((8.25, 0), (-3.0465144017, 7.6668931126), (-6, -5.6623758265))
            Line((-6, -5.6623758265), (-6, 0))
        make_face()
        with BuildLine():
            ThreePointArc((8.25, 0), (7.6668931126, -3.0465144017), (6, -5.6623758265))
            Line((6, -5.6623758265), (6, -12.0105544532))
            Line((6, -12.0105544532), (9.7977845316, -12.0105544532))
            ThreePointArc((9.7977845316, -12.0105544532), (0, 15.5), (-9.7977845316, -12.0105544532))
            Line((-9.7977845316, -12.0105544532), (-6, -12.0105544532))
            Line((-6, -12.0105544532), (-6, -5.6623758265))
            ThreePointArc((-6, -5.6623758265), (-3.0465144017, 7.6668931126), (8.25, 0))
        make_face()
        with Locations((-11, -5.9371710435)):
            Circle(F42_R, mode=Mode.SUBTRACT)
        with Locations((11, -5.9371710435)):
            Circle(F42_R, mode=Mode.SUBTRACT)
        with Locations((-11, 5.9371710435)):
            Circle(F42_R, mode=Mode.SUBTRACT)
        with Locations((11, 5.9371710435)):
            Circle(F42_R, mode=Mode.SUBTRACT)
    extrude(amount=F43_DEPTH)

    # F44 (on face) → F45 (cut)
    with BuildSketch(Plane.XY.offset(13)):
        with BuildLine():
            Line((8, -12.0105544532), (8, 0))
            ThreePointArc((8, 0), (0, 8), (-8, 0))
            Line((-8, 0), (-8, -12.0105544532))
            Line((-8, -12.0105544532), (-6, -12.0105544532))
            Line((-6, -12.0105544532), (-6, 0))
            ThreePointArc((-6, 0), (0, 6), (6, 0))
            Line((6, 0), (6, -12.0105544532))
            Line((6, -12.0105544532), (8, -12.0105544532))
        make_face()
    extrude(amount=-F45_DEPTH, mode=Mode.SUBTRACT)


solid = Compound([f1.part, f43.part])
